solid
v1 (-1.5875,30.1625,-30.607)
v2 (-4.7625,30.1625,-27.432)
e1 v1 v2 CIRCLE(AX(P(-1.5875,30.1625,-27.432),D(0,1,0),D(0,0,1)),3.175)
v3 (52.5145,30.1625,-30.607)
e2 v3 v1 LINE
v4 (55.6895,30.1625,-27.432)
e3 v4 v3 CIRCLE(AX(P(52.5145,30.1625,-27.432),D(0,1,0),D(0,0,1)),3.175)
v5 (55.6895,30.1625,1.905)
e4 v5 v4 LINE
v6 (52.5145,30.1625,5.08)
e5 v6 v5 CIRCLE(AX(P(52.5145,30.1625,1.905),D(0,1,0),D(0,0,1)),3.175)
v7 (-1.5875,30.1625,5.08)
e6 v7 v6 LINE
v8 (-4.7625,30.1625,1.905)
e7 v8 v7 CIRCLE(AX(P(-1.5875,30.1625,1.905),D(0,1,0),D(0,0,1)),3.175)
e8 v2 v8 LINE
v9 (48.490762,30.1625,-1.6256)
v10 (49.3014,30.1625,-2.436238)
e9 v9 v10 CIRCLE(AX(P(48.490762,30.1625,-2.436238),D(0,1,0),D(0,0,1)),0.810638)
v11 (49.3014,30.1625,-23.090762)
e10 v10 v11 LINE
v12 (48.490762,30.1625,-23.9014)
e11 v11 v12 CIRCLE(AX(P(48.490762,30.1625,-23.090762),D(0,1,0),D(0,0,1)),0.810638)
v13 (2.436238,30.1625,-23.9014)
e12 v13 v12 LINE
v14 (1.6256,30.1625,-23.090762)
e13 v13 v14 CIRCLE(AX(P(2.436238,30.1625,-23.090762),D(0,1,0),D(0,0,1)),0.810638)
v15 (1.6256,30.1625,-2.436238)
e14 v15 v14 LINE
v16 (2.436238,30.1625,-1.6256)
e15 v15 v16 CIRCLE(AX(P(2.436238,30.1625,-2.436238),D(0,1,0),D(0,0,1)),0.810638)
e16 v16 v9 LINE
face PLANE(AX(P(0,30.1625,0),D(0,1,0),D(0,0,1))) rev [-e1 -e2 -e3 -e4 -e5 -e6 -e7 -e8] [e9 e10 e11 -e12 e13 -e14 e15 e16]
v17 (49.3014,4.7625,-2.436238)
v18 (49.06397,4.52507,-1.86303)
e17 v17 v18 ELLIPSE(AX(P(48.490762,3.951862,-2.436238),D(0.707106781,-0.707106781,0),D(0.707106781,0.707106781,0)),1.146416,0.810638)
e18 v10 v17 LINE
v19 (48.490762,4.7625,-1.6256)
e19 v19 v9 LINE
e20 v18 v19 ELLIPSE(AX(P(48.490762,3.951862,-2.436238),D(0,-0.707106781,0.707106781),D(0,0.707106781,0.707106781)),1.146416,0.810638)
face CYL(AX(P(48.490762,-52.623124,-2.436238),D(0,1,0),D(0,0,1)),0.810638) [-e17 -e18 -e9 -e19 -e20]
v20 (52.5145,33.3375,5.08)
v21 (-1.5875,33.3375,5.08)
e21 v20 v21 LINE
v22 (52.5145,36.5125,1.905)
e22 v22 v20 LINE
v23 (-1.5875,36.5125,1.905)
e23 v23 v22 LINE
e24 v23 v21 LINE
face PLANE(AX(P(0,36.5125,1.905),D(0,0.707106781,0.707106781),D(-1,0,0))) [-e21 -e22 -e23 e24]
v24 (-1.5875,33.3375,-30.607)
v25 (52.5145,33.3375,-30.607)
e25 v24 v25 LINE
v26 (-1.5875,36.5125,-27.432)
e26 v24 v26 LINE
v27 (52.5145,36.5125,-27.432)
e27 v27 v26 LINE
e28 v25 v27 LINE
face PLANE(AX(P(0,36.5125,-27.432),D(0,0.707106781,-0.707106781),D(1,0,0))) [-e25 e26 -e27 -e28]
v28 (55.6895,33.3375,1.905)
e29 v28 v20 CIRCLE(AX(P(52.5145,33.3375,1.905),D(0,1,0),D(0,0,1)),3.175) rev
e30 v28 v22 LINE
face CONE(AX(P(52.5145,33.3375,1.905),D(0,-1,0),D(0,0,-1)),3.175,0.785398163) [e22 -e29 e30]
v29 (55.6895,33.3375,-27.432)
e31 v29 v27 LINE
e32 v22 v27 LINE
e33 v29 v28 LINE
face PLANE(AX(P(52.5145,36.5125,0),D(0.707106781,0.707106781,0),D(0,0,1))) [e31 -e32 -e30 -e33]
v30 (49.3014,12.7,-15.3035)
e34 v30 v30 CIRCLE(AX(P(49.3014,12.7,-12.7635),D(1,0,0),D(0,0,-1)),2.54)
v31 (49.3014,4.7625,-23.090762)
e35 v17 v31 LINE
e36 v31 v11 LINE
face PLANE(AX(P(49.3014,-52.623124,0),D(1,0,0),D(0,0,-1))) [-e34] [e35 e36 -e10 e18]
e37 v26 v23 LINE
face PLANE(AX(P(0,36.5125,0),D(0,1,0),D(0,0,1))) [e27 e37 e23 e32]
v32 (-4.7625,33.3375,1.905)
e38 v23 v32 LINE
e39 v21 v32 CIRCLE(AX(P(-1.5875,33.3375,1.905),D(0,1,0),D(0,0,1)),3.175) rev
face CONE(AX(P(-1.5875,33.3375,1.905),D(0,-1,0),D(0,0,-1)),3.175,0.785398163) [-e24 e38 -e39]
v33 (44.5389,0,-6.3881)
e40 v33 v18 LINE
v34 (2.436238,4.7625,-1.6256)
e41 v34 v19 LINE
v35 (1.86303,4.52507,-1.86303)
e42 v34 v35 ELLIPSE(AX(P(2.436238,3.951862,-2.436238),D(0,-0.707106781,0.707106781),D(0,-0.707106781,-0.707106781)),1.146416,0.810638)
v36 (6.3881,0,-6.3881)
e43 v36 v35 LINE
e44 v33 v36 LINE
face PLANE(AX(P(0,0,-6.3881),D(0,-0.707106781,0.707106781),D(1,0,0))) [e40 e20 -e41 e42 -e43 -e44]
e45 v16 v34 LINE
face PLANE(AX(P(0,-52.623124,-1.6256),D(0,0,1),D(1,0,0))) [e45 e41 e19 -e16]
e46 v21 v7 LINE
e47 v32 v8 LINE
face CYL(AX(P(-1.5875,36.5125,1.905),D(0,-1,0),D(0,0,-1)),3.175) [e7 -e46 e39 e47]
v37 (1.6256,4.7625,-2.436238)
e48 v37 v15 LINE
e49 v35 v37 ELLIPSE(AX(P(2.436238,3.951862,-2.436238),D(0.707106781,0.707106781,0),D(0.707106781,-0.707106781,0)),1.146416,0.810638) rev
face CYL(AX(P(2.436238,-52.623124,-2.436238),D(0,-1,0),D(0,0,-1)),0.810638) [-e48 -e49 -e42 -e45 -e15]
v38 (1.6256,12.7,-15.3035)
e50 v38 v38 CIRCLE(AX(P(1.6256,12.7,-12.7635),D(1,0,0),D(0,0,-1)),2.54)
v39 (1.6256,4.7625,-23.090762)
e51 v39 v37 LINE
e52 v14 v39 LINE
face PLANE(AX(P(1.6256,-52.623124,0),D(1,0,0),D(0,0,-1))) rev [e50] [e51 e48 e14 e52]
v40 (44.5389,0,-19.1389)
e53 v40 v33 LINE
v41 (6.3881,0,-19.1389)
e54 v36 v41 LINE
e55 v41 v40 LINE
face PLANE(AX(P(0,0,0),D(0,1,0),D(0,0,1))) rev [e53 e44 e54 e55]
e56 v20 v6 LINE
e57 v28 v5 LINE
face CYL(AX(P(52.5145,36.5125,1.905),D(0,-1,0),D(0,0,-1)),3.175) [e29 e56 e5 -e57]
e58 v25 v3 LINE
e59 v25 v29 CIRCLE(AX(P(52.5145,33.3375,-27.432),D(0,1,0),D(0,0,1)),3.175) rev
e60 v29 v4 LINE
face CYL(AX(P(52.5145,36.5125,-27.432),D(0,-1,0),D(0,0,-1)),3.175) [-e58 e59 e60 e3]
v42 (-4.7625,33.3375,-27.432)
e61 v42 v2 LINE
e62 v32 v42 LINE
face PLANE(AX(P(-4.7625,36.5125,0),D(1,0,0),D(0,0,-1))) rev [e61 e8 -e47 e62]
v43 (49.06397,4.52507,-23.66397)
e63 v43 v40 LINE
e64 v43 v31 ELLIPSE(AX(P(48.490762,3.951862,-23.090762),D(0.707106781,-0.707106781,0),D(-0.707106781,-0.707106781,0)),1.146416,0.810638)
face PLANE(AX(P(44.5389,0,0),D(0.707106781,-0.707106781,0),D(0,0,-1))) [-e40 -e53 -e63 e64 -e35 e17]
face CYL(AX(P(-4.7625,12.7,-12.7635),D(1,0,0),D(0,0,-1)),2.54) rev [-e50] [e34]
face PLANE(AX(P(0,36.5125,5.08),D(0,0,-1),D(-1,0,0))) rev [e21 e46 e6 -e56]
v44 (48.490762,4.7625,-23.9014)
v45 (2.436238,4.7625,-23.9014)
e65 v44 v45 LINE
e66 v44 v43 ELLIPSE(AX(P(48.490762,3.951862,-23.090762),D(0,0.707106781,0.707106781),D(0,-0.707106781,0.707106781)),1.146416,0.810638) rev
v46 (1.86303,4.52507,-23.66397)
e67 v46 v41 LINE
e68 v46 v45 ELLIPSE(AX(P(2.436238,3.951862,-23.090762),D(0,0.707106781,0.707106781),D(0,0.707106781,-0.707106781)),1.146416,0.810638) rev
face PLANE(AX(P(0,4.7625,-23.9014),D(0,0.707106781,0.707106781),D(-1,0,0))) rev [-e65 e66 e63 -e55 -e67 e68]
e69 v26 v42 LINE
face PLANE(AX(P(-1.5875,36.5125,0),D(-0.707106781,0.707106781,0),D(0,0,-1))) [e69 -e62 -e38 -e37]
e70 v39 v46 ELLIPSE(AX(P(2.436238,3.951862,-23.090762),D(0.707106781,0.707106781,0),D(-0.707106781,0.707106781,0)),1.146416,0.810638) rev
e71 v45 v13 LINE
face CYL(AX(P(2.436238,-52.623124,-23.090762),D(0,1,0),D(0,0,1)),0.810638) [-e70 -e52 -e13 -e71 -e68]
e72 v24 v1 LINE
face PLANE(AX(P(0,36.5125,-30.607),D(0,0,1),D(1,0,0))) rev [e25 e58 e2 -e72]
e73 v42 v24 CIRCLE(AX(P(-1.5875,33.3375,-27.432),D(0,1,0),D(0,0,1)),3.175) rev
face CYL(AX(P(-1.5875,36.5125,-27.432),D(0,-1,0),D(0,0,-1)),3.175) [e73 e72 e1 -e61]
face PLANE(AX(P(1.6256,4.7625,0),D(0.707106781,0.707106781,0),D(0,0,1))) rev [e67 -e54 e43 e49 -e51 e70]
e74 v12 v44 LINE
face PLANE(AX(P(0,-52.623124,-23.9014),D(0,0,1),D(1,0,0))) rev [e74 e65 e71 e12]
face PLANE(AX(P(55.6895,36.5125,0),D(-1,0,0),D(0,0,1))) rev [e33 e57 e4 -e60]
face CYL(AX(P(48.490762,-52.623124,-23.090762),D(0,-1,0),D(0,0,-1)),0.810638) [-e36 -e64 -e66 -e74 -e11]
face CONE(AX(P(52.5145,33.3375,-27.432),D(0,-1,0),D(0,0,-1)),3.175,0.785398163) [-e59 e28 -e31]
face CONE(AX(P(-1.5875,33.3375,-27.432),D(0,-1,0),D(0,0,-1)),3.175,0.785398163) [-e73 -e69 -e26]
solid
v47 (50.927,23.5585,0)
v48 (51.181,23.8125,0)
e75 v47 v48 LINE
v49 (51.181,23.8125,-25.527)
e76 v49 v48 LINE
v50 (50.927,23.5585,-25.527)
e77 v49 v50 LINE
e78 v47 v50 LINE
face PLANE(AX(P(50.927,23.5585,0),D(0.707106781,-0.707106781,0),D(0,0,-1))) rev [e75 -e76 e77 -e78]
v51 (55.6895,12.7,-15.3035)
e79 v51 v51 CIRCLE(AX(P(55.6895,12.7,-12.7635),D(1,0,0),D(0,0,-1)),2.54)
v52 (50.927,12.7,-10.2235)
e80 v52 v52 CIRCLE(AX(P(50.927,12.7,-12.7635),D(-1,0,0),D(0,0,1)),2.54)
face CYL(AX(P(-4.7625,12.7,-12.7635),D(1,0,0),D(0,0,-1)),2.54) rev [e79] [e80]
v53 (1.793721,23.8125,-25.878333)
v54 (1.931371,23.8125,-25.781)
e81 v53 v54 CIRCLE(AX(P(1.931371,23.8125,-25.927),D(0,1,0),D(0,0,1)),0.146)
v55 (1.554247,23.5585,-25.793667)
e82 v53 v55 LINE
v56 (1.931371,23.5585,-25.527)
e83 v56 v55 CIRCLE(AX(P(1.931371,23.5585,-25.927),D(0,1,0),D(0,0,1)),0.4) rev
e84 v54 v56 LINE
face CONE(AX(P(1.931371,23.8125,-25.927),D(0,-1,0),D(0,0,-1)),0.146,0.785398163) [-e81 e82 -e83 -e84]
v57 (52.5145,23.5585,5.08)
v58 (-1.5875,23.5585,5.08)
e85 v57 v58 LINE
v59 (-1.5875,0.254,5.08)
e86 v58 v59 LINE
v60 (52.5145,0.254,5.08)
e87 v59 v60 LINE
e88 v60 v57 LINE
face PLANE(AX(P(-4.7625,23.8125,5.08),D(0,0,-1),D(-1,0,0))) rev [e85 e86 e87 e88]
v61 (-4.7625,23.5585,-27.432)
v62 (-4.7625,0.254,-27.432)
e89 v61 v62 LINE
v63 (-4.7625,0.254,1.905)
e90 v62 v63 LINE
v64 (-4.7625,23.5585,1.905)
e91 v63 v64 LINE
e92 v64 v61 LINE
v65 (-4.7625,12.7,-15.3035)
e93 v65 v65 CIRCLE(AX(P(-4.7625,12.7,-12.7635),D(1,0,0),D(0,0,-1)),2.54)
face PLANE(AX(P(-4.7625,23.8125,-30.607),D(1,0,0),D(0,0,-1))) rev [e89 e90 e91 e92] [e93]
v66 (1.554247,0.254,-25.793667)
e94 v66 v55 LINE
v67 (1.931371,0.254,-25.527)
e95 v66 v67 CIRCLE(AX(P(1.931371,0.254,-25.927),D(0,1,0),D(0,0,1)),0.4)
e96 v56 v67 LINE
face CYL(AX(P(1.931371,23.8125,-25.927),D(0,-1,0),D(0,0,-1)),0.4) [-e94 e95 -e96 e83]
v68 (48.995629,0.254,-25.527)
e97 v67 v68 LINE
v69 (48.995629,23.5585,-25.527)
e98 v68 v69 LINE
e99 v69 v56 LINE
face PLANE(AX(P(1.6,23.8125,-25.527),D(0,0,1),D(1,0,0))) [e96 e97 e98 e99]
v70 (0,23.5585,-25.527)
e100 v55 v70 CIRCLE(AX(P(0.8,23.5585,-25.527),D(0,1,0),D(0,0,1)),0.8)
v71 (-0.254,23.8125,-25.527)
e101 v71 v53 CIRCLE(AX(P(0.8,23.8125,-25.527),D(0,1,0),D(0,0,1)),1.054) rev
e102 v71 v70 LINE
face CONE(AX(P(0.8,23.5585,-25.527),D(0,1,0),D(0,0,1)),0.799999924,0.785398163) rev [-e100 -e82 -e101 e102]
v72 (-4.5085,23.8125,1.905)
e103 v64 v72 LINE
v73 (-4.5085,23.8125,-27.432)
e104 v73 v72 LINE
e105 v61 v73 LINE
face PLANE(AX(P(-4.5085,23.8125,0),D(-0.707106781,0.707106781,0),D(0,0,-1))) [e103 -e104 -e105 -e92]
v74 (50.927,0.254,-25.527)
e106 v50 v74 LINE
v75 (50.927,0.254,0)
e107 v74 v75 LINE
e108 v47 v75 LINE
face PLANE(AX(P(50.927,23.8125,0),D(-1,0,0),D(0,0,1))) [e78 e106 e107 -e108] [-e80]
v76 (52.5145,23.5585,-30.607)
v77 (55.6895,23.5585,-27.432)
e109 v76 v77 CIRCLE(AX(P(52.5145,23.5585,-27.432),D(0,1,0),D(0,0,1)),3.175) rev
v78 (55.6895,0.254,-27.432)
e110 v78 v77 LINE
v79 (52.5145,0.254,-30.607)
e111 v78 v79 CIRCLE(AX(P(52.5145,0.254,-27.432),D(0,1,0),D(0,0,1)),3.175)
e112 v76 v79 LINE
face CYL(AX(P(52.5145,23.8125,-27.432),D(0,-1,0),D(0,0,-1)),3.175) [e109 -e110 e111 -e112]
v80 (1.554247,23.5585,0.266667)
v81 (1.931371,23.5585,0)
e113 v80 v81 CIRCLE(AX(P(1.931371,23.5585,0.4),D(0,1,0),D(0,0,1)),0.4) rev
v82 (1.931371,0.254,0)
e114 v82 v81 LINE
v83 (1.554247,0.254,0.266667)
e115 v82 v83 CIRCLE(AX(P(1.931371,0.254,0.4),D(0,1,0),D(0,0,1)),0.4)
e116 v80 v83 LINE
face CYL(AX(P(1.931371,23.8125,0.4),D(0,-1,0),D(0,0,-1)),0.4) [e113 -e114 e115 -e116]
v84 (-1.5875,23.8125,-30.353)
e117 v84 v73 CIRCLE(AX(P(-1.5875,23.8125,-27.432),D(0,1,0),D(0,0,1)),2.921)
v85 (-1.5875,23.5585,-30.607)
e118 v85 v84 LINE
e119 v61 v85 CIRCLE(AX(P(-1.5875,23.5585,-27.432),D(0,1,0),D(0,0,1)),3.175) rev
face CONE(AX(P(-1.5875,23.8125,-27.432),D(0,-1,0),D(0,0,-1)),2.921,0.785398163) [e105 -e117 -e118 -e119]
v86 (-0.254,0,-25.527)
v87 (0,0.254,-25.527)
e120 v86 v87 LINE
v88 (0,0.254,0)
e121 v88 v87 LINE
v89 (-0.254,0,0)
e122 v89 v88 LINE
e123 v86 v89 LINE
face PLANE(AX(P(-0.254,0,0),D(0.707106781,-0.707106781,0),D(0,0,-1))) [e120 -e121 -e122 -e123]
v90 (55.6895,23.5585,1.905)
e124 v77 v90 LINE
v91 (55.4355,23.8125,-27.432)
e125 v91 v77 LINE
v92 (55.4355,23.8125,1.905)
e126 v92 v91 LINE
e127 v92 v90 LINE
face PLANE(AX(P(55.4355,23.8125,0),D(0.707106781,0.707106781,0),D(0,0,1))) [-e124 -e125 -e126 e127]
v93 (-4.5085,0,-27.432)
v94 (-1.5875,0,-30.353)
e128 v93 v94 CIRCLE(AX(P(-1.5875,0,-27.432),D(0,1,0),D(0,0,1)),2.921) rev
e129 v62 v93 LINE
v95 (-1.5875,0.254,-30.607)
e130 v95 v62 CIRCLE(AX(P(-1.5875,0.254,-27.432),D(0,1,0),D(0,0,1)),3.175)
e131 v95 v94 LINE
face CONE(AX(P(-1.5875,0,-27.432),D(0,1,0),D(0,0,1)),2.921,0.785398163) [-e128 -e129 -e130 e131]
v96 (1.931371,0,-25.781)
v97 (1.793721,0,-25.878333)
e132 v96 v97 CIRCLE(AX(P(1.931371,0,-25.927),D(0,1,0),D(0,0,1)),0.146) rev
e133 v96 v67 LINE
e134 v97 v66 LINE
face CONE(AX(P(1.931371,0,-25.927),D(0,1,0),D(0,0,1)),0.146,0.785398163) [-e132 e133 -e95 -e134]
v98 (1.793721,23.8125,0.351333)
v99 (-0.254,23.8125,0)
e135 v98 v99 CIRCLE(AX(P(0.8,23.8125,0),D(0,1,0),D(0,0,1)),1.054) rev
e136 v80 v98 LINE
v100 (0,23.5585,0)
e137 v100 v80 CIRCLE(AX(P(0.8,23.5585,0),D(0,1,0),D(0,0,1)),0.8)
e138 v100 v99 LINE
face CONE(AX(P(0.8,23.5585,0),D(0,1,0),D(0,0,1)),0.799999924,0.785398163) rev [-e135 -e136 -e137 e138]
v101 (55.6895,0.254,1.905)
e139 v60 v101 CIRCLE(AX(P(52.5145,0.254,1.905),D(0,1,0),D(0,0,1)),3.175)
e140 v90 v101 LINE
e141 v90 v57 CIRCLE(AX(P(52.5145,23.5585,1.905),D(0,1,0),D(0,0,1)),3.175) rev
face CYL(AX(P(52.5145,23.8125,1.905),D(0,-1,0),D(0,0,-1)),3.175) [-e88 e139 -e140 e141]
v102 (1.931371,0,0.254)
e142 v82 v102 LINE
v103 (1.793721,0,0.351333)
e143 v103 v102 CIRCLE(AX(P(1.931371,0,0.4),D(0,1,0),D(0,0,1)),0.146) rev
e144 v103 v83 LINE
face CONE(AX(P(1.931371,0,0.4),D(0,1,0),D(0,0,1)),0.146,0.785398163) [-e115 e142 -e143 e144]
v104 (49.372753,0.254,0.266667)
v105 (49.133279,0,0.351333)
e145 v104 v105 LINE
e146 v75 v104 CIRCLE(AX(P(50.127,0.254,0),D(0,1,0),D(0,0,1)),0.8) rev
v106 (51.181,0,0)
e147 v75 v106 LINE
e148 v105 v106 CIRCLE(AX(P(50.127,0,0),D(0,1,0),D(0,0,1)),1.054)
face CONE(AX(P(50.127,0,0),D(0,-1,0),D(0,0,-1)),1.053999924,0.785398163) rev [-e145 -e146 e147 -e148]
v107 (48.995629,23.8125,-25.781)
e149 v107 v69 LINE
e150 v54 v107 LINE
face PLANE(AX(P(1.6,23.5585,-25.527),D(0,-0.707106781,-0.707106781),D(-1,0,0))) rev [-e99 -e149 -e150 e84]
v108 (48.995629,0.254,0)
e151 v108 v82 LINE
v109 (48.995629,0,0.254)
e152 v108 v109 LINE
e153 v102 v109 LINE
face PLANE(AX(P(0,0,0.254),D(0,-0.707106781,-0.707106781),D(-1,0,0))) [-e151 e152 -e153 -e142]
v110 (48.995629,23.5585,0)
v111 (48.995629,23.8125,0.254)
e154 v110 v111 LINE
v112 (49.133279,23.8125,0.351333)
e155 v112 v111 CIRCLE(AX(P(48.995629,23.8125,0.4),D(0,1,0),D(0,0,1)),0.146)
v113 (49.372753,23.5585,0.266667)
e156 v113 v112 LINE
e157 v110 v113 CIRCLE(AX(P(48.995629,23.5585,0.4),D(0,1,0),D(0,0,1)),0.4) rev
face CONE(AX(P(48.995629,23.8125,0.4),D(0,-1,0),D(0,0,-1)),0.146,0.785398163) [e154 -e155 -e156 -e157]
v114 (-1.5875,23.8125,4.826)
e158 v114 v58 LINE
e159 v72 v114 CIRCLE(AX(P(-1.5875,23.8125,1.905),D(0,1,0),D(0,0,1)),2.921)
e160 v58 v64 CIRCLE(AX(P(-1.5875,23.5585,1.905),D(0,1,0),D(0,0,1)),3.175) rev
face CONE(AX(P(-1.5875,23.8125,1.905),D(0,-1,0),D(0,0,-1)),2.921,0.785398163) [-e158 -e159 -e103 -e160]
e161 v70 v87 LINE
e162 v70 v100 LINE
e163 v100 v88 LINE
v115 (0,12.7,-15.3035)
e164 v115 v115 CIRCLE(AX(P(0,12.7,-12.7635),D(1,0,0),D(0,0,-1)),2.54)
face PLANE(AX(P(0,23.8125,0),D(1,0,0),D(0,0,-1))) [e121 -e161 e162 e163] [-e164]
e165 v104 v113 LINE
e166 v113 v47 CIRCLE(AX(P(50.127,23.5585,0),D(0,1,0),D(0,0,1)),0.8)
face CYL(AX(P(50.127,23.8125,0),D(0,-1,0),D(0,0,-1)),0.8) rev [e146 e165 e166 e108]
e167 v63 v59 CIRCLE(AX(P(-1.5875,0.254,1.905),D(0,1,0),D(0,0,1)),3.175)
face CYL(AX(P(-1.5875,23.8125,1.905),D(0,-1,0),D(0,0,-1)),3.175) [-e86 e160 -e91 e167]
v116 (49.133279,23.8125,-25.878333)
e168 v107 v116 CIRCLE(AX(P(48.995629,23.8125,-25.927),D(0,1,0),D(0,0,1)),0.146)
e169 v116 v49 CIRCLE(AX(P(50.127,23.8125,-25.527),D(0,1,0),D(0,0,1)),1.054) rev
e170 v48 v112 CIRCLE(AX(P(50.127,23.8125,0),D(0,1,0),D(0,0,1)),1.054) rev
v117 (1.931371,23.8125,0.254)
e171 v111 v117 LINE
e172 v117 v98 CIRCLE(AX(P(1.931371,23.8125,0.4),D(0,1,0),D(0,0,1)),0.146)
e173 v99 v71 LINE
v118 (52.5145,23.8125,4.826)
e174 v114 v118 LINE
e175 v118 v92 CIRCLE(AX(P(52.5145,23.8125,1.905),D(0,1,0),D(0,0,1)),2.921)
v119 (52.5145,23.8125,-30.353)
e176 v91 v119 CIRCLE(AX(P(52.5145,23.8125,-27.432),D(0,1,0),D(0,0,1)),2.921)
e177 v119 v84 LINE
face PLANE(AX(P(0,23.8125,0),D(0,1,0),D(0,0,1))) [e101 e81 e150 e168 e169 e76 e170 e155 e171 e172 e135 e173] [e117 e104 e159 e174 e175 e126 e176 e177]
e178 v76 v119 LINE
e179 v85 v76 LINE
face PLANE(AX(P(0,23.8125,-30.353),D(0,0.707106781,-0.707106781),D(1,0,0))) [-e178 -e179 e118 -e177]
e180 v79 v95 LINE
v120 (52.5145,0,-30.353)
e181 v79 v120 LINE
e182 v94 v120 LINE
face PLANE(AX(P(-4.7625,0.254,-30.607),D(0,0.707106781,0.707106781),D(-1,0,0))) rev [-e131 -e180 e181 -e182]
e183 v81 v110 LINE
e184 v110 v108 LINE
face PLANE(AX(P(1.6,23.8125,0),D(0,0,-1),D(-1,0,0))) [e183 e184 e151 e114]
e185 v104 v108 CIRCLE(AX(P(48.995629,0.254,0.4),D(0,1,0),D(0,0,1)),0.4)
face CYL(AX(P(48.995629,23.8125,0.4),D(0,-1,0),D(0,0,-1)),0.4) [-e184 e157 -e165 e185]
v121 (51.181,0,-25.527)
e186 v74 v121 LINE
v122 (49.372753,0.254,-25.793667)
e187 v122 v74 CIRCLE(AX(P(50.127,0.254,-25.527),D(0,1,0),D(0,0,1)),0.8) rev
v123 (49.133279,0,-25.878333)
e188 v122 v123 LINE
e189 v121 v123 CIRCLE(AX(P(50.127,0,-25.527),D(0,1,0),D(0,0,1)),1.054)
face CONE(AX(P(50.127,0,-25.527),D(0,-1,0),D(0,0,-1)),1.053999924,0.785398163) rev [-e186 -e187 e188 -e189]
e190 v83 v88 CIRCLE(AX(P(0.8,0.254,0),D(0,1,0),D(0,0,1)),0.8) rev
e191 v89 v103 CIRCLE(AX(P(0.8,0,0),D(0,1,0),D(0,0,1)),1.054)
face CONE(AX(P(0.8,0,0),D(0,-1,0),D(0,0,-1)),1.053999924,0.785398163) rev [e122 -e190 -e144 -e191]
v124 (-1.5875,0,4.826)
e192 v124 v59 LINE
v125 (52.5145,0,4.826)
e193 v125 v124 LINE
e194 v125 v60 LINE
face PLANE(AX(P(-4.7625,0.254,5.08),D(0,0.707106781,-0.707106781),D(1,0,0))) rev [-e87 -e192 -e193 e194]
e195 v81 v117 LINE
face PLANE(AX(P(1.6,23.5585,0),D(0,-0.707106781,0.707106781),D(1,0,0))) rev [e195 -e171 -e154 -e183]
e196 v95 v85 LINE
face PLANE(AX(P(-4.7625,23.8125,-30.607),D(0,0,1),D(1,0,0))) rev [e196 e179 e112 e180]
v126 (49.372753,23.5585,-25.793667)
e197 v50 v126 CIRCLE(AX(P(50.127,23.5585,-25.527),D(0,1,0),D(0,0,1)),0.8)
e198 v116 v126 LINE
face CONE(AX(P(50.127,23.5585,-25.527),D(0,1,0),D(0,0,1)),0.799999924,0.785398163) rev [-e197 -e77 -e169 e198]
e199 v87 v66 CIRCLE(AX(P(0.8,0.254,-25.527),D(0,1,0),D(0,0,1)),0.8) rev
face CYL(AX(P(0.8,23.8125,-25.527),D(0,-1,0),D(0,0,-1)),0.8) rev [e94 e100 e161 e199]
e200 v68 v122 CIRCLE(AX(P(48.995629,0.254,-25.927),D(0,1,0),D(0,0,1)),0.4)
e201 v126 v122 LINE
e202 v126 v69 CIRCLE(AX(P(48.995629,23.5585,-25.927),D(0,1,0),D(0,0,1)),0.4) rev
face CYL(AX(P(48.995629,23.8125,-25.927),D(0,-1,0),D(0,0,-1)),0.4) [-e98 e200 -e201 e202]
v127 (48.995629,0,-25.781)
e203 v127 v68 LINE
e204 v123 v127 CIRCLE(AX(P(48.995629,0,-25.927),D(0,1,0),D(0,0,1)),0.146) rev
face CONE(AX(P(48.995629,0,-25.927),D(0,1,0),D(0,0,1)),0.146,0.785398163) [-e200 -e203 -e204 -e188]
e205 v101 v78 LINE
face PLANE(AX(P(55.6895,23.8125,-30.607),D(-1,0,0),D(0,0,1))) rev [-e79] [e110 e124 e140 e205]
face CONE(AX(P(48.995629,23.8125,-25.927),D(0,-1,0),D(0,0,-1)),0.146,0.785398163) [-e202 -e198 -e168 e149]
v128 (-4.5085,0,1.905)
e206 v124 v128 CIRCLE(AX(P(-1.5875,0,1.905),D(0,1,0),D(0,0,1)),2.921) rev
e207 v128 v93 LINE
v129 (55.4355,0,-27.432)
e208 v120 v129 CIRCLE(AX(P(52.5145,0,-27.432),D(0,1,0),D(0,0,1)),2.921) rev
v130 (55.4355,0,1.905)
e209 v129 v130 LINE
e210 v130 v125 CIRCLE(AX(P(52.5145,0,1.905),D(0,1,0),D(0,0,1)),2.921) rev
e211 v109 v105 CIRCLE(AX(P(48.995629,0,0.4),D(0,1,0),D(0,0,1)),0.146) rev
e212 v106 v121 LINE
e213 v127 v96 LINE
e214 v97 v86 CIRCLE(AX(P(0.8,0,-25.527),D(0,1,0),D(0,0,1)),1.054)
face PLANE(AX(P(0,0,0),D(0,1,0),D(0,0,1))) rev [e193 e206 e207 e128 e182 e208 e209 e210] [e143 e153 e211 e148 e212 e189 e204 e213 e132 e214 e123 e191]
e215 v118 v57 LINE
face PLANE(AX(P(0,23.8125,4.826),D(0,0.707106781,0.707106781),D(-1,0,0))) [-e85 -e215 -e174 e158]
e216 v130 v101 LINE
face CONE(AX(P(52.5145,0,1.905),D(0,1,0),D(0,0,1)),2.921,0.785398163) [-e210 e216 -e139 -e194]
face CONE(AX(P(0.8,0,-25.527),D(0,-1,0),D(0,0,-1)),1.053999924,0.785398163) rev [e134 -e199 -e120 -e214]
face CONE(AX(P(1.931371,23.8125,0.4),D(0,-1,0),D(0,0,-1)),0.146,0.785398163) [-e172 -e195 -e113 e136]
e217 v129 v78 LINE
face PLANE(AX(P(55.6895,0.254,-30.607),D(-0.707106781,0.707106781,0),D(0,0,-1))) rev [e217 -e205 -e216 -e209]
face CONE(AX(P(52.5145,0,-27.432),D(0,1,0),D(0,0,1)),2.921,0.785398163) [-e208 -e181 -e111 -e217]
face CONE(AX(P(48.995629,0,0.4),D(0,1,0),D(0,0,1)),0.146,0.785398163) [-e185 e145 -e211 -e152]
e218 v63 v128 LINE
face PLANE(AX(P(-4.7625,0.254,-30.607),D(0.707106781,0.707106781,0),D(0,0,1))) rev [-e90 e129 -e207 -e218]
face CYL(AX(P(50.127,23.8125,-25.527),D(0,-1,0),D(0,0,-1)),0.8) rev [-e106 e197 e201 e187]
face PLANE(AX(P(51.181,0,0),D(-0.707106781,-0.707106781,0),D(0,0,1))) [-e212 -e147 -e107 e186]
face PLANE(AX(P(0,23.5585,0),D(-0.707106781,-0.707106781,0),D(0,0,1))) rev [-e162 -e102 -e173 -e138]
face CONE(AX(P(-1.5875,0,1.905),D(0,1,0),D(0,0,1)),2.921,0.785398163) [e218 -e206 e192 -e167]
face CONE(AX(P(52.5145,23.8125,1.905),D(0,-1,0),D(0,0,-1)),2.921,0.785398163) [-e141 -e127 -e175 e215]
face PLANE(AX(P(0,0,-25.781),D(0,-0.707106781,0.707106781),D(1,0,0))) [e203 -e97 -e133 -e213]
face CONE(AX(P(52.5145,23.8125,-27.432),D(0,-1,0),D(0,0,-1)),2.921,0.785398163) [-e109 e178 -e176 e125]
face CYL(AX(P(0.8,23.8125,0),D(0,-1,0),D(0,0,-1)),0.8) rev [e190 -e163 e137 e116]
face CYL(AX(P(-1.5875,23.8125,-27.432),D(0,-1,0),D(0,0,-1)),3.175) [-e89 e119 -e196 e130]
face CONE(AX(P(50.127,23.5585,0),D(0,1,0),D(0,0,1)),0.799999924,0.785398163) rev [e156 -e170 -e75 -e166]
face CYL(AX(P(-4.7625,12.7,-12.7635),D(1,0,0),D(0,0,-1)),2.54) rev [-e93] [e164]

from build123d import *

# Parameters (mm, degrees)
SKETCH1_W           = 60.452
SKETCH1_H           = 35.687
BOSS_EXTRUDE1_DEPTH = 23.8125
FILLET1_R           = 3.175
FILLET2_R           = 0.4
SKETCH2_W           = 47.6758
SKETCH2_H           = 22.2758
BOSS_EXTRUDE2_DEPTH = 6.35
SKETCH2_4_W         = 47.6758
SKETCH2_4_H         = 22.2758
BOSS_EXTRUDE3_DEPTH = 30.1625
CHAMFER1_SIZE       = 3.175
CHAMFER2_SIZE       = 4.7625
CHAMFER3_SIZE       = 0.254
FILLET3_R           = 0.810638298
SKETCH3_R           = 2.54
CUT_EXTRUDE1_DEPTH  = 77.970094253


with BuildPart() as part:
    # Sketch1 → Boss-Extrude1 (new body)
    with BuildSketch(Plane(origin=(0, 0, 0), x_dir=(1, 0, 0), z_dir=(0, 1, 0))):
        with Locations((25.4635, 12.7635)):
            Rectangle(SKETCH1_W, SKETCH1_H)
        with BuildLine():
            Line((1.599999848, 0), (49.327000152, 0))
            ThreePointArc((49.327000152, 0), (50.127000076, -0.799999924), (50.927, 0))
            Line((50.927, 0), (50.927, 25.527))
            ThreePointArc((50.927, 25.527), (50.127000076, 26.326999924), (49.327000152, 25.527))
            Line((49.327000152, 25.527), (1.599999848, 25.527))
            ThreePointArc((1.599999848, 25.527), (0.799999924, 26.326999924), (0, 25.527))
            Line((0, 25.527), (0, 0))
            ThreePointArc((0, 0), (0.799999924, -0.799999924), (1.599999848, 0))
        make_face(mode=Mode.SUBTRACT)
    extrude(amount=BOSS_EXTRUDE1_DEPTH)

    # Fillet1
    fillet1_edges = [part.edges().sort_by_distance(p)[0] for p in [
        (-4.7625, 11.90625, -30.607),
        (55.6895, 11.90625, -30.607),
        (55.6895, 11.90625, 5.08),
        (-4.7625, 11.90625, 5.08),
    ]]
    fillet(fillet1_edges, radius=FILLET1_R)

    # Fillet2
    fillet2_edges = [part.edges().sort_by_distance(p)[0] for p in [
        (1.599999848, 11.90625, 0),
        (49.327000152, 11.90625, 0),
        (49.327000152, 11.90625, -25.527),
        (1.599999848, 11.90625, -25.527),
    ]]
    fillet(fillet2_edges, radius=FILLET2_R)

    # Chamfer3
    chamfer3_edges = [part.edges().sort_by_distance(p)[0] for p in [
        (0.664718345, 0, 0.788478771),
        (50.927, 0, -12.7635),
        (50.262281655, 0, -26.315478771),
        (0, 0, -12.7635),
        (0.664718345, 23.8125, 0.788478771),
        (50.927, 23.8125, -12.7635),
        (50.262281655, 23.8125, -26.315478771),
        (0, 23.8125, -12.7635),
        (-4.7625, 0, -12.7635),
        (-4.7625, 23.8125, -12.7635),
        (25.4635, 0, -30.607),
        (55.6895, 0, -12.7635),
        (25.4635, 0, 5.08),
        (-3.83256403, 0, 4.15006403),
        (54.75956403, 0, 4.15006403),
        (54.75956403, 0, -29.67706403),
        (-3.83256403, 0, -29.67706403),
        (25.4635, 23.8125, -30.607),
        (25.4635, 23.8125, 5.08),
        (55.6895, 23.8125, -12.7635),
        (-3.83256403, 23.8125, 4.15006403),
        (54.75956403, 23.8125, 4.15006403),
        (54.75956403, 23.8125, -29.67706403),
        (-3.83256403, 23.8125, -29.67706403),
        (25.4635, 0, 0),
        (25.4635, 23.8125, 0),
        (50.262281655, 0, 0.788478771),
        (25.4635, 0, -25.527),
        (0.664718345, 0, -26.315478771),
        (1.700430589, 0, 0.073401365),
        (1.700430589, 0, -25.600401365),
        (49.226569411, 0, -25.600401365),
        (49.226569411, 0, 0.073401365),
        (50.262281655, 23.8125, 0.788478771),
        (0.664718345, 23.8125, -26.315478771),
        (25.4635, 23.8125, -25.527),
        (1.700430589, 23.8125, 0.073401365),
        (1.700430589, 23.8125, -25.600401365),
        (49.226569411, 23.8125, -25.600401365),
        (49.226569411, 23.8125, 0.073401365),
    ]]
    chamfer(chamfer3_edges, length=CHAMFER3_SIZE)


with BuildPart() as body_2:
    # Sketch2 → Boss-Extrude2 (new body)
    # profile 1 of 2: a face of its own
    with BuildSketch(Plane(origin=(0, 30.1625, 0), x_dir=(1, 0, 0), z_dir=(0, 1, 0))):
        with BuildLine():
            Line((55.6895, -1.905), (55.6895, 27.432))
            ThreePointArc((55.6895, 27.432), (54.75956403, 29.67706403), (52.5145, 30.607))
            Line((52.5145, 30.607), (-1.5875, 30.607))
            ThreePointArc((-1.5875, 30.607), (-3.83256403, 29.67706403), (-4.7625, 27.432))
            Line((-4.7625, 27.432), (-4.7625, -1.905))
            ThreePointArc((-4.7625, -1.905), (-3.83256403, -4.15006403), (-1.5875, -5.08))
            Line((-1.5875, -5.08), (52.5145, -5.08))
            ThreePointArc((52.5145, -5.08), (54.75956403, -4.15006403), (55.6895, -1.905))
        make_face()
        with Locations((25.4635, 12.7635)):
            Rectangle(SKETCH2_W, SKETCH2_H, mode=Mode.SUBTRACT)
    # profile 2 of 2: a face of its own
    with BuildSketch(Plane(origin=(0, 30.1625, 0), x_dir=(1, 0, 0), z_dir=(0, 1, 0))):
        with Locations((25.4635, 12.7635)):
            Rectangle(SKETCH2_W, SKETCH2_H)
    extrude(amount=BOSS_EXTRUDE2_DEPTH)

    # Sketch2<4> → Boss-Extrude3 (add)
    with BuildSketch(Plane(origin=(0, 30.1625, 0), x_dir=(1, 0, 0), z_dir=(0, 1, 0))):
        with Locations((25.4635, 12.7635)):
            Rectangle(SKETCH2_4_W, SKETCH2_4_H)
    extrude(amount=-BOSS_EXTRUDE3_DEPTH)

    # Chamfer1
    chamfer1_edges = [body_2.edges().sort_by_distance(p)[0] for p in [
        (54.75956403, 36.5125, -29.67706403),
        (25.4635, 36.5125, -30.607),
        (-3.83256403, 36.5125, -29.67706403),
        (-4.7625, 36.5125, -12.7635),
        (-3.83256403, 36.5125, 4.15006403),
        (25.4635, 36.5125, 5.08),
        (54.75956403, 36.5125, 4.15006403),
        (55.6895, 36.5125, -12.7635),
    ]]
    chamfer(chamfer1_edges, length=CHAMFER1_SIZE - 0.0001)  # a hair under: the kernel refuses the full size

    # Chamfer2
    chamfer2_edges = [body_2.edges().sort_by_distance(p)[0] for p in [
        (1.6256, 0, -12.7635),
        (25.4635, 0, -23.9014),
        (49.3014, 0, -12.7635),
        (25.4635, 0, -1.6256),
    ]]
    chamfer(chamfer2_edges, length=CHAMFER2_SIZE)

    # Fillet3
    fillet3_edges = [body_2.edges().sort_by_distance(p)[0] for p in [
        (1.6256, 17.4625, -23.9014),
        (1.6256, 17.4625, -1.6256),
        (49.3014, 17.4625, -1.6256),
        (49.3014, 17.4625, -23.9014),
    ]]
    fillet(fillet3_edges, radius=FILLET3_R)


with BuildPart() as cut_extrude1_tool:
    # Sketch3 → Cut-Extrude1 (new, through all)
    with BuildSketch(Plane(origin=(55.6895, 0, 0), x_dir=(0, 0, -1), z_dir=(1, 0, 0))):
        with Locations((12.7635, 12.7)):
            Circle(SKETCH3_R)
    extrude(amount=-CUT_EXTRUDE1_DEPTH)


with BuildPart() as part_1:
    add(part.part)

    # Cut-Extrude1: cut by cut_extrude1_tool
    add(cut_extrude1_tool.part, mode=Mode.SUBTRACT)


with BuildPart() as body_2_1:
    add(body_2.part)

    # Cut-Extrude1: cut by cut_extrude1_tool
    add(cut_extrude1_tool.part, mode=Mode.SUBTRACT)


solid = Compound([part_1.part, body_2_1.part])
